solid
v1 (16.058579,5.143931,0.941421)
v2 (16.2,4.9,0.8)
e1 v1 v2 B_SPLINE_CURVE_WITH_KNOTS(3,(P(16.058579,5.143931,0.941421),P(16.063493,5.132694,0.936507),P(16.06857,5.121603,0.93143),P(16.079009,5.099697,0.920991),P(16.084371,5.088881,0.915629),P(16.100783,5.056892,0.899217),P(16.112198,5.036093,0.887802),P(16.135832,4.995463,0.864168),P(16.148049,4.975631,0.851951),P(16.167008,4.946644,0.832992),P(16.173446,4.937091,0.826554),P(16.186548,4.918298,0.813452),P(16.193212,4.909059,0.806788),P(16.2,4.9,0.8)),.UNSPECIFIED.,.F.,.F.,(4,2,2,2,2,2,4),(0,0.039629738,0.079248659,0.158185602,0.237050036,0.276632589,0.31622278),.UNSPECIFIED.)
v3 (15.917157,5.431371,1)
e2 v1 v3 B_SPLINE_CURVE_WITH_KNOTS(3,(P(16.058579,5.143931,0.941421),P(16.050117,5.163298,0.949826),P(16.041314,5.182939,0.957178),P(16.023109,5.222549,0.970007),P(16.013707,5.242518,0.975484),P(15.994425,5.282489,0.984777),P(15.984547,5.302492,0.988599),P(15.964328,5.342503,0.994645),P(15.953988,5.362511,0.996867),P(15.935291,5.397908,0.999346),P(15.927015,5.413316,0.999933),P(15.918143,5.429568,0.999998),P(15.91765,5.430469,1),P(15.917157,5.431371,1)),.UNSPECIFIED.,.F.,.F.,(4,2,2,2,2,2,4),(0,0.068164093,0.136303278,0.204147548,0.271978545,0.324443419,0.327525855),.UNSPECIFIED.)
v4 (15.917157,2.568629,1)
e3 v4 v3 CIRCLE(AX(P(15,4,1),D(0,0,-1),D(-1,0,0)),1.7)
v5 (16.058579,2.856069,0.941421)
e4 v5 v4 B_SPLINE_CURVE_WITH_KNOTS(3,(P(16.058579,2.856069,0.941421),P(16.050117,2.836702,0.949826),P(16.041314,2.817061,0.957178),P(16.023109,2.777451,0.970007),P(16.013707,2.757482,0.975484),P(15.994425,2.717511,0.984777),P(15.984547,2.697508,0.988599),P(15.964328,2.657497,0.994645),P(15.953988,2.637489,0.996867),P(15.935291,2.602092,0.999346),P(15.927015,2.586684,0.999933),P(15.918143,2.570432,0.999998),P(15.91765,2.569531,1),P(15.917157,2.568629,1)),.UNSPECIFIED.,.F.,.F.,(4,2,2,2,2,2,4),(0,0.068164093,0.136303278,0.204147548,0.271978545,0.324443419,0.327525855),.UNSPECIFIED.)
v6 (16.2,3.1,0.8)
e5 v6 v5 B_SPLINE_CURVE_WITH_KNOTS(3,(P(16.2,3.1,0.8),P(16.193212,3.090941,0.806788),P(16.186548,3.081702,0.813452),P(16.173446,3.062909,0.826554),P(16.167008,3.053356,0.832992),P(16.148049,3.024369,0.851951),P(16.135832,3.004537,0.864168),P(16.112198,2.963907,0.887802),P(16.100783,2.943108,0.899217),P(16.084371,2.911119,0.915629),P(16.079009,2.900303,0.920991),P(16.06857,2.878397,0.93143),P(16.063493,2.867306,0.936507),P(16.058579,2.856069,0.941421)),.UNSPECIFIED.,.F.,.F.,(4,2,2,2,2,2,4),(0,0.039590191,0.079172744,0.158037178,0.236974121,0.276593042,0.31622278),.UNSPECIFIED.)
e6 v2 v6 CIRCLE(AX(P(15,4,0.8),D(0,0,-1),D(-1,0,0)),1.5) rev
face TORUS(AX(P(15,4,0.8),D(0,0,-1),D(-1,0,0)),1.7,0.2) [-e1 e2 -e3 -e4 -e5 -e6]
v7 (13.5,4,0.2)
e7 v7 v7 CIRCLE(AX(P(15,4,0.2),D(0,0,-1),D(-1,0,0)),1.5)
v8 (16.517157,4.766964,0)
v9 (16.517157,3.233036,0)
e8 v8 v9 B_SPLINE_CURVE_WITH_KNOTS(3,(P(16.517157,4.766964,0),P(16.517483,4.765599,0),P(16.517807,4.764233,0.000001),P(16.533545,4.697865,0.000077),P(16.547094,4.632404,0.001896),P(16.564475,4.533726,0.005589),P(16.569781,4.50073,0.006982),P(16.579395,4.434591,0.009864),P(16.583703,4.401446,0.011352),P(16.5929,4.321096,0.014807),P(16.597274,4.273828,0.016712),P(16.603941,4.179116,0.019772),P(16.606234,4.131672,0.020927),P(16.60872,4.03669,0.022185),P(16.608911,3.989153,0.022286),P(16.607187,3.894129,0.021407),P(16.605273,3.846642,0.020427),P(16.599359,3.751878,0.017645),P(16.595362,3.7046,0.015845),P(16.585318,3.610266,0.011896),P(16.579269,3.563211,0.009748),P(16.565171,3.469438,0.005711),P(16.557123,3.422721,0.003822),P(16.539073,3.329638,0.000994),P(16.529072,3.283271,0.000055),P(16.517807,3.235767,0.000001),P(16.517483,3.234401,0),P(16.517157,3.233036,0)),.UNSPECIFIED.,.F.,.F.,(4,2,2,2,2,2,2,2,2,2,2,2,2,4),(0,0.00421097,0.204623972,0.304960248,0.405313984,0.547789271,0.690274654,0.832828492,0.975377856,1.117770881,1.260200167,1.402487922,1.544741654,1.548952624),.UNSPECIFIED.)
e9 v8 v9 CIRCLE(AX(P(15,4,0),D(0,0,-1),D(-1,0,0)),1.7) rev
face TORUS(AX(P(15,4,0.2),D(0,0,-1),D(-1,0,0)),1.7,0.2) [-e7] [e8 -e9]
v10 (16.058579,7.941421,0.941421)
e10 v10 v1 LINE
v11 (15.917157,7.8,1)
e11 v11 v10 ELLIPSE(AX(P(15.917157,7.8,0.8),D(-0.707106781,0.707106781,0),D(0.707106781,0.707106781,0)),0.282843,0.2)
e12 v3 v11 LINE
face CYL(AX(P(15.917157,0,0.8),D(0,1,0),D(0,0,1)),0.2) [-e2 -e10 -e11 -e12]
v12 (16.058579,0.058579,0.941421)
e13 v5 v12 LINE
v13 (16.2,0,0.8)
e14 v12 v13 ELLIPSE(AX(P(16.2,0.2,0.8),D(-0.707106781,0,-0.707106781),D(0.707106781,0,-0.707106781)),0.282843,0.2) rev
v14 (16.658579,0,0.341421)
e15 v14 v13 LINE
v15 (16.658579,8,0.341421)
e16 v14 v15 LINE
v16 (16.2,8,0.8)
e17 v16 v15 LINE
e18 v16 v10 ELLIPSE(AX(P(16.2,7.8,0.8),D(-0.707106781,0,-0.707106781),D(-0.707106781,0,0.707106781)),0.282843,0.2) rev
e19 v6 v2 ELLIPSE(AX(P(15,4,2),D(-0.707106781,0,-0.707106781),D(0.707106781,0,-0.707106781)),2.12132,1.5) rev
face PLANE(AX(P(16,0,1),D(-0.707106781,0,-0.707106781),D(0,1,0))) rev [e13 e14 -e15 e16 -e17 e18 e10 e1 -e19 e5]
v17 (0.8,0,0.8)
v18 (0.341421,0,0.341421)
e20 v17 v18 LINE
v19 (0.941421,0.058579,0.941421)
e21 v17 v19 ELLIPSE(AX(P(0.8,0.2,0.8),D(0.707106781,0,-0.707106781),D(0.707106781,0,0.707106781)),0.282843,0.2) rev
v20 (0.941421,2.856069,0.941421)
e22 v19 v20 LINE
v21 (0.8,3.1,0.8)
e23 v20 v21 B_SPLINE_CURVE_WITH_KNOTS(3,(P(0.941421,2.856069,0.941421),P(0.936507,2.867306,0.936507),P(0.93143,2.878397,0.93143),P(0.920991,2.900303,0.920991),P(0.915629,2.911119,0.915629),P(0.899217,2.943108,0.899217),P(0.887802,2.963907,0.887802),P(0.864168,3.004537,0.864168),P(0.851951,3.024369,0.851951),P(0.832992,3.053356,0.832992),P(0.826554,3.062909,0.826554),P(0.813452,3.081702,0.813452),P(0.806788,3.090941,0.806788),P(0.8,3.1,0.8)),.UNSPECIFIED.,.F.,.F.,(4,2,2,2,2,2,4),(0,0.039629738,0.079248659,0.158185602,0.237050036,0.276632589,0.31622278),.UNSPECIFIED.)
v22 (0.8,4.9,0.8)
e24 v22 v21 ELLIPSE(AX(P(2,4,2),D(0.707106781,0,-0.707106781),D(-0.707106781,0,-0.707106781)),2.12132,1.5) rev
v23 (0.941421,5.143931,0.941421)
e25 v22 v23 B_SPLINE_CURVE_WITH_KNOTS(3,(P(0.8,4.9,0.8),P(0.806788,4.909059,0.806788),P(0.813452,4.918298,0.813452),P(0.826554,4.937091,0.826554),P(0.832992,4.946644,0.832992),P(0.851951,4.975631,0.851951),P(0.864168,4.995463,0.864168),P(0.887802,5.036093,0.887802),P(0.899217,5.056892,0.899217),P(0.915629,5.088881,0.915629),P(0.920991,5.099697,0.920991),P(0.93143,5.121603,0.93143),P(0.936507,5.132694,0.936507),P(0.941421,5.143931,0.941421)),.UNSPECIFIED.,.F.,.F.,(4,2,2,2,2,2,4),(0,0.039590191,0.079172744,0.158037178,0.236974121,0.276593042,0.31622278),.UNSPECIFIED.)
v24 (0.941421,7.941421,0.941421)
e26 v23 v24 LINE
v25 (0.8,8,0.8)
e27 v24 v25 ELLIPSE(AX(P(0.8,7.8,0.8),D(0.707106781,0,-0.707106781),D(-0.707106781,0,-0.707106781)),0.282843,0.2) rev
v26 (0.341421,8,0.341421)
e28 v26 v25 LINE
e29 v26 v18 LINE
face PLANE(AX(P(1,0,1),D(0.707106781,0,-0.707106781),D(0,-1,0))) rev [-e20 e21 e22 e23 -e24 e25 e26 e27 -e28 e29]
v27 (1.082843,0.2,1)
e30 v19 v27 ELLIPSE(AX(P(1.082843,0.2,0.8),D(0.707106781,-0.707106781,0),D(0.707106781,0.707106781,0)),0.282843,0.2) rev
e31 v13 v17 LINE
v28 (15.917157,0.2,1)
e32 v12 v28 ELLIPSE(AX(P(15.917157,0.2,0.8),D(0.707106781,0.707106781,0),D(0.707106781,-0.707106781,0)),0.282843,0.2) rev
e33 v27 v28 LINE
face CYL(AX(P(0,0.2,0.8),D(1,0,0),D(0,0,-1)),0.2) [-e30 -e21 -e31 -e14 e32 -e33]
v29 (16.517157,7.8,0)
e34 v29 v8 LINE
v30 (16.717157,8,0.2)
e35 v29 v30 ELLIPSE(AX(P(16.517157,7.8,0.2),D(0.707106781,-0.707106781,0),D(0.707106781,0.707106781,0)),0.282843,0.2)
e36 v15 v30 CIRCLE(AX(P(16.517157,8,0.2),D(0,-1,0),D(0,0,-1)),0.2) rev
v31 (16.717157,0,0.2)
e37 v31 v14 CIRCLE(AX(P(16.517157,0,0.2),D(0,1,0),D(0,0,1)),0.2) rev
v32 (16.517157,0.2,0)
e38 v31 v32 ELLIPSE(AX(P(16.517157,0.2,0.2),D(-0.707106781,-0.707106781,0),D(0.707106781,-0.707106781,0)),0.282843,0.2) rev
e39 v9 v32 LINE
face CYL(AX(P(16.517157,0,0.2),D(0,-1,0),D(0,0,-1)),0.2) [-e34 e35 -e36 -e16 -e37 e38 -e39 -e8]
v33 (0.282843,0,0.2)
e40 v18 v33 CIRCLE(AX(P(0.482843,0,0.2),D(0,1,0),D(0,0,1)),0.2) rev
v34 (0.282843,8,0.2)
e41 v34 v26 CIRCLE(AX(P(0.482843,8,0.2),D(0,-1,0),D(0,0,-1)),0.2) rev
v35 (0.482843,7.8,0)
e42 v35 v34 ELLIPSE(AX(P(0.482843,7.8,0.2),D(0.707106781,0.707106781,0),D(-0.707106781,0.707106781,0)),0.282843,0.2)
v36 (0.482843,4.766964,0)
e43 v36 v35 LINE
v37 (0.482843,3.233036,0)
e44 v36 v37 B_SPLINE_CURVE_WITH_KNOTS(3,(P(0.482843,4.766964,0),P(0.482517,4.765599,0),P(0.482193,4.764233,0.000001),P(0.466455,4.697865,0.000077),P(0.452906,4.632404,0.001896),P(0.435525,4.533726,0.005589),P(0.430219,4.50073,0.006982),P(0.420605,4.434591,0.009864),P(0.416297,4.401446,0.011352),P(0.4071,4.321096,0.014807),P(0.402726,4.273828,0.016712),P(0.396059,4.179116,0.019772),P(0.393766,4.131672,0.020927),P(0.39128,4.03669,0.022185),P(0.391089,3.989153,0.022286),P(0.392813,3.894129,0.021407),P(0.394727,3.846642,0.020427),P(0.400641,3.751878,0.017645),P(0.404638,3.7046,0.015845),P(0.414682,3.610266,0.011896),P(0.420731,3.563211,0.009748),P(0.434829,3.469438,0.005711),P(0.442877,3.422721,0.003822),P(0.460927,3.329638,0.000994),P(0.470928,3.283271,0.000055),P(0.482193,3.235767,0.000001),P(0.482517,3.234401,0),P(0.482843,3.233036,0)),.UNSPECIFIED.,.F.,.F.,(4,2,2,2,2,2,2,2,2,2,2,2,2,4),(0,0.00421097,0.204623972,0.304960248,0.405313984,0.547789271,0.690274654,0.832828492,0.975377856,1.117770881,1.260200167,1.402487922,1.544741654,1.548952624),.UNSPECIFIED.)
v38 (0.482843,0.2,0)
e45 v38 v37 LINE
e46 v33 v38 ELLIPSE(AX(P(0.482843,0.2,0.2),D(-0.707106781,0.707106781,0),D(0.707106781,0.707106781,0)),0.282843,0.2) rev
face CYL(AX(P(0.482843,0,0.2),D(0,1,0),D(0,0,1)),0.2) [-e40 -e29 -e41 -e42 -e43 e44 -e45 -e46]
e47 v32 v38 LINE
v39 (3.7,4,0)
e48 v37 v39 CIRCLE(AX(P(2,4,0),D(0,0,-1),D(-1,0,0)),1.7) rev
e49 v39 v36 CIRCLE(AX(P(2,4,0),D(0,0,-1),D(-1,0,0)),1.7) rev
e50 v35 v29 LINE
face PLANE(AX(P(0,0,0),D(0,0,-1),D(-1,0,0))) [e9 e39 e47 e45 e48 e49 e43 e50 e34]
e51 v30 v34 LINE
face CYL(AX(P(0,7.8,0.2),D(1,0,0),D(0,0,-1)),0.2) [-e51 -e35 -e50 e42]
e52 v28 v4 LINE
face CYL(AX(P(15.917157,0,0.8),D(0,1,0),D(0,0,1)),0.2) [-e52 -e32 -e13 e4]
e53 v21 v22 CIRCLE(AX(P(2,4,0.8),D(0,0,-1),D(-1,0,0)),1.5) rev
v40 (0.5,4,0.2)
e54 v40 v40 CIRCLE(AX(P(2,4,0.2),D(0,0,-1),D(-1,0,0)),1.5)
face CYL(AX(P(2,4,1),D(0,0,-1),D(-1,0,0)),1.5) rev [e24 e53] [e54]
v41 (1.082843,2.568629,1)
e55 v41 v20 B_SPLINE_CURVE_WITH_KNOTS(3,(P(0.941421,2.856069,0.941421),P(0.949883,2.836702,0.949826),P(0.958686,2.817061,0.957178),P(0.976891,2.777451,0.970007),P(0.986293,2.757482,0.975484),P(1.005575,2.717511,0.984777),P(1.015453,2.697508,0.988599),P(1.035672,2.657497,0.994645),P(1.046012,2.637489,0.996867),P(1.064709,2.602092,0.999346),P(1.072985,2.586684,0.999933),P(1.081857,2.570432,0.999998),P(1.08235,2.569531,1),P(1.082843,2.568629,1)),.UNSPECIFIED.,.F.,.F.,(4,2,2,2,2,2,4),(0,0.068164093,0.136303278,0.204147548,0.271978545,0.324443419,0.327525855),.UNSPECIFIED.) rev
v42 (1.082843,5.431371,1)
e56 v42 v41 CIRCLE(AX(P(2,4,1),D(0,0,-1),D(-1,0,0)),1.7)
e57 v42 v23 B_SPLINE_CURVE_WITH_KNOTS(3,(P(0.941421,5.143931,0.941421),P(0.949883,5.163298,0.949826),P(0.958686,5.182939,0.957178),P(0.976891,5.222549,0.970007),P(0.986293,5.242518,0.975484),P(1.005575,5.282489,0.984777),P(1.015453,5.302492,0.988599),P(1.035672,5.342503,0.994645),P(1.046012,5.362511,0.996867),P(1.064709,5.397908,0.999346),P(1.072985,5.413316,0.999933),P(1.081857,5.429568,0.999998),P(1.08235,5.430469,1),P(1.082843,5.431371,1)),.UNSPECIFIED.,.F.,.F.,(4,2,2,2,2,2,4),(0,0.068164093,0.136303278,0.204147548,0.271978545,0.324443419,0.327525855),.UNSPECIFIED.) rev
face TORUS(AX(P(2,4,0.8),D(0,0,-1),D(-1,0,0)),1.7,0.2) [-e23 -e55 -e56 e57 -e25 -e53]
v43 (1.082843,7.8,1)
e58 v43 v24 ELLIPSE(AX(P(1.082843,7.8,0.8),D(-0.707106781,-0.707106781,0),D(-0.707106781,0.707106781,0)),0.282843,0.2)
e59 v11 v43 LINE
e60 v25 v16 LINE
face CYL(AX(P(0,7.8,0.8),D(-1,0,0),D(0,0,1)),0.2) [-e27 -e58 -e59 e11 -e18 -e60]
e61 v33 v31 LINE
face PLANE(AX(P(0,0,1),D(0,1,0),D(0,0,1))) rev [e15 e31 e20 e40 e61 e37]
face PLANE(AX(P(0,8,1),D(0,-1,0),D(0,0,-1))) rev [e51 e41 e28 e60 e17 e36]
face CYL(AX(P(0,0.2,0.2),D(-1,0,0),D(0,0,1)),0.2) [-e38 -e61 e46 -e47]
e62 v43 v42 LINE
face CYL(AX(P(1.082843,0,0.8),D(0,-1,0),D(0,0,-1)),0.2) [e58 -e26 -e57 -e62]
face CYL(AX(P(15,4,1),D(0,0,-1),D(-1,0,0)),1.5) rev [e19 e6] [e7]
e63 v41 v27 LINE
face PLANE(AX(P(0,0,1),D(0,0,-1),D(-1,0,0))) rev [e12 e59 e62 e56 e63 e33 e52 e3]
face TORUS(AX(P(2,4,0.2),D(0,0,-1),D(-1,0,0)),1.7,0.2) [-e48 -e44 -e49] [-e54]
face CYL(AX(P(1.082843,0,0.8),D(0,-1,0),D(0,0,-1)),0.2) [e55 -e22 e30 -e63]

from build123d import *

# Parameters (mm, degrees)
ESQUISSE1_W        = 17
ESQUISSE1_H        = 8
ESQUISSE1_R        = 1.5
BOSS_EXTRU_1_DEPTH = 1
CHANFREIN1_SIZE    = 1
CONG_1_R           = 0.2


with BuildPart() as part:
    # Esquisse1 → Boss.-Extru.1 (new body)
    with BuildSketch(Plane.XY):
        with Locations((8.5, 4)):
            Rectangle(ESQUISSE1_W, ESQUISSE1_H)
        with Locations((2, 4)):
            Circle(ESQUISSE1_R, mode=Mode.SUBTRACT)
        with Locations((15, 4)):
            Circle(ESQUISSE1_R, mode=Mode.SUBTRACT)
    extrude(amount=BOSS_EXTRU_1_DEPTH)

    # Chanfrein1
    # the kernel refuses this chamfer: 1 mm, written as the material it takes off along each edge
    with BuildSketch(Plane(origin=(17, -2.571682988, 1), x_dir=(0.02749587661058563, 0, -0.9996219169112968), z_dir=(0, 1, 0)), Plane(origin=(0, 10.571682988, 1), x_dir=(-0.027495876610586372, 0, -0.9996219169112968), z_dir=(0, -1, 0))) as chanfrein1_piece_1:
        Polygon((CHANFREIN1_SIZE * 0.999621916911, CHANFREIN1_SIZE * 0.0274958766106), (-CHANFREIN1_SIZE * 0.0274958766106, CHANFREIN1_SIZE * 0.999621916911), (0, 0), align=None)
    extrude(amount=13.143365976, mode=Mode.SUBTRACT)

    # Congé1
    # the kernel refuses this fillet: 0.2 mm, written as the material it takes off along each edge
    with BuildSketch(Plane(origin=(15, 4, 0), x_dir=(1, 0, 0), z_dir=(0, -1, 0))) as cong_1_piece_1:
        with BuildLine():
            CenterArc((1.5 + CONG_1_R, CONG_1_R), CONG_1_R, 180, 90)
            Line((1.5, CONG_1_R), (1.5, 0))
            Line((1.5, 0), (1.5 + CONG_1_R, 0))
        make_face()
    revolve(axis=Axis((15, 4, 0), (0, 0, 1)), mode=Mode.SUBTRACT)
    with BuildSketch(Plane(origin=(-0.5, 0, 0), x_dir=(0, 0, 1), z_dir=(1, 0, 0))) as cong_1_piece_2:
        with BuildLine():
            CenterArc((CONG_1_R, -CONG_1_R), CONG_1_R, 90, 90)
            Line((0, -CONG_1_R), (0, 0))
            Line((0, 0), (CONG_1_R, 0))
        make_face()
    extrude(amount=18, mode=Mode.SUBTRACT)
    with BuildSketch(Plane(origin=(17, -1.207106781, 0), x_dir=(-1, 0, 0), z_dir=(0, 1, 0)), Plane(origin=(0, 9.207106781, 0), x_dir=(1, 0, 0), z_dir=(0, -1, 0))) as cong_1_piece_3:
        with BuildLine():
            CenterArc((CONG_1_R * 2.41421356237, CONG_1_R), CONG_1_R, 135, 135)
            Line((CONG_1_R * 1.70710678119, CONG_1_R * 1.70710678119), (0, 0))
            Line((0, 0), (CONG_1_R * 2.41421356237, 0))
        make_face()
    extrude(amount=10.414213562, mode=Mode.SUBTRACT)
    with BuildSketch(Plane(origin=(17.5, 8, 0), x_dir=(0, -1, 0), z_dir=(-1, 0, 0))) as cong_1_piece_4:
        with BuildLine():
            CenterArc((CONG_1_R, CONG_1_R), CONG_1_R, 180, 90)
            Line((0, CONG_1_R), (0, 0))
            Line((0, 0), (CONG_1_R, 0))
        make_face()
    extrude(amount=18, mode=Mode.SUBTRACT)
    with BuildSketch(Plane(origin=(2, 4, 0), x_dir=(1, 0, 0), z_dir=(0, -1, 0))) as cong_1_piece_5:
        with BuildLine():
            CenterArc((1.5 + CONG_1_R, CONG_1_R), CONG_1_R, 180, 90)
            Line((1.5, CONG_1_R), (1.5, 0))
            Line((1.5, 0), (1.5 + CONG_1_R, 0))
        make_face()
    revolve(axis=Axis((2, 4, 0), (0, 0, 1)), mode=Mode.SUBTRACT)
    with BuildSketch(Plane(origin=(1, 3.089072792, 1), x_dir=(1, 0, 0), z_dir=(0, -1, 0)), Plane(origin=(1, 8.207106781, 1), x_dir=(1, 0, 0), z_dir=(0, -1, 0))) as cong_1_piece_6:
        with BuildLine():
            CenterArc((CONG_1_R * 0.414213562373, -CONG_1_R), CONG_1_R, 90, 45)
            Line((-CONG_1_R * 0.292893218813, -CONG_1_R * 0.292893218813), (0, 0))
            Line((0, 0), (CONG_1_R * 0.414213562373, 0))
        make_face()
    extrude(amount=3.296179574, mode=Mode.SUBTRACT)
    with BuildSketch(Plane(origin=(2, 4, 1), x_dir=(-0.8739874769428458, -0.4859484439187749, 0), z_dir=(-0.4859484439187749, 0.8739874769428458, 0))) as cong_1_piece_7:
        with BuildLine():
            CenterArc((1.5 + CONG_1_R, -CONG_1_R), CONG_1_R, 90, 90)
            Line((1.5, -CONG_1_R), (1.5, 0))
            Line((1.5, 0), (1.5 + CONG_1_R, 0))
        make_face()
    revolve(axis=Axis((2, 4, 1), (0, 0, 1)), revolution_arc=150.925369424, mode=Mode.SUBTRACT)
    with BuildSketch(Plane(origin=(16.5, 8, 1), x_dir=(0, -1, 0), z_dir=(-1, 0, 0))) as cong_1_piece_8:
        with BuildLine():
            CenterArc((CONG_1_R, -CONG_1_R), CONG_1_R, 90, 90)
            Line((0, -CONG_1_R), (0, 0))
            Line((0, 0), (CONG_1_R, 0))
        make_face()
    extrude(amount=16, mode=Mode.SUBTRACT)
    with BuildSketch(Plane(origin=(16, 4.910927208, 1), x_dir=(0.707106781186839, 0, -0.707106781186256), z_dir=(0, 1, 0)), Plane(origin=(16, -0.207106781, 1), x_dir=(0.707106781186839, 0, -0.707106781186256), z_dir=(0, 1, 0))) as cong_1_piece_9:
        with BuildLine():
            CenterArc((CONG_1_R * 0.414213562373, CONG_1_R), CONG_1_R, 225, 45)
            Line((-CONG_1_R * 0.292893218813, CONG_1_R * 0.292893218813), (0, 0))
            Line((0, 0), (CONG_1_R * 0.414213562373, 0))
        make_face()
    extrude(amount=3.296179574, mode=Mode.SUBTRACT)
    with BuildSketch(Plane(origin=(15, 4, 1), x_dir=(0.8744070091205912, 0.48519313927629093, 0), z_dir=(0.48519313927629093, -0.8744070091205912, 0))) as cong_1_piece_10:
        with BuildLine():
            CenterArc((1.5 + CONG_1_R, -CONG_1_R), CONG_1_R, 90, 90)
            Line((1.5, -CONG_1_R), (1.5, 0))
            Line((1.5, 0), (1.5 + CONG_1_R, 0))
        make_face()
    revolve(axis=Axis((15, 4, 1), (0, 0, 1)), revolution_arc=301.949745716, mode=Mode.SUBTRACT)
    with BuildSketch(Plane(origin=(0.5, 0, 1), x_dir=(0, 0, -1), z_dir=(1, 0, 0))) as cong_1_piece_11:
        with BuildLine():
            CenterArc((CONG_1_R, CONG_1_R), CONG_1_R, 180, 90)
            Line((0, CONG_1_R), (0, 0))
            Line((0, 0), (CONG_1_R, 0))
        make_face()
    extrude(amount=16, mode=Mode.SUBTRACT)
    with BuildSketch(Plane(origin=(2, 4, 1), x_dir=(1, 0, 0), z_dir=(0, -1, 0))) as cong_1_piece_12:
        with BuildLine():
            CenterArc((1.5 + CONG_1_R, -CONG_1_R), CONG_1_R, 90, 90)
            Line((1.5, -CONG_1_R), (1.5, 0))
            Line((1.5, 0), (1.5 + CONG_1_R, 0))
        make_face()
    revolve(axis=Axis((2, 4, 1), (0, 0, 1)), revolution_arc=150.925369424, mode=Mode.SUBTRACT)


solid = part.part
